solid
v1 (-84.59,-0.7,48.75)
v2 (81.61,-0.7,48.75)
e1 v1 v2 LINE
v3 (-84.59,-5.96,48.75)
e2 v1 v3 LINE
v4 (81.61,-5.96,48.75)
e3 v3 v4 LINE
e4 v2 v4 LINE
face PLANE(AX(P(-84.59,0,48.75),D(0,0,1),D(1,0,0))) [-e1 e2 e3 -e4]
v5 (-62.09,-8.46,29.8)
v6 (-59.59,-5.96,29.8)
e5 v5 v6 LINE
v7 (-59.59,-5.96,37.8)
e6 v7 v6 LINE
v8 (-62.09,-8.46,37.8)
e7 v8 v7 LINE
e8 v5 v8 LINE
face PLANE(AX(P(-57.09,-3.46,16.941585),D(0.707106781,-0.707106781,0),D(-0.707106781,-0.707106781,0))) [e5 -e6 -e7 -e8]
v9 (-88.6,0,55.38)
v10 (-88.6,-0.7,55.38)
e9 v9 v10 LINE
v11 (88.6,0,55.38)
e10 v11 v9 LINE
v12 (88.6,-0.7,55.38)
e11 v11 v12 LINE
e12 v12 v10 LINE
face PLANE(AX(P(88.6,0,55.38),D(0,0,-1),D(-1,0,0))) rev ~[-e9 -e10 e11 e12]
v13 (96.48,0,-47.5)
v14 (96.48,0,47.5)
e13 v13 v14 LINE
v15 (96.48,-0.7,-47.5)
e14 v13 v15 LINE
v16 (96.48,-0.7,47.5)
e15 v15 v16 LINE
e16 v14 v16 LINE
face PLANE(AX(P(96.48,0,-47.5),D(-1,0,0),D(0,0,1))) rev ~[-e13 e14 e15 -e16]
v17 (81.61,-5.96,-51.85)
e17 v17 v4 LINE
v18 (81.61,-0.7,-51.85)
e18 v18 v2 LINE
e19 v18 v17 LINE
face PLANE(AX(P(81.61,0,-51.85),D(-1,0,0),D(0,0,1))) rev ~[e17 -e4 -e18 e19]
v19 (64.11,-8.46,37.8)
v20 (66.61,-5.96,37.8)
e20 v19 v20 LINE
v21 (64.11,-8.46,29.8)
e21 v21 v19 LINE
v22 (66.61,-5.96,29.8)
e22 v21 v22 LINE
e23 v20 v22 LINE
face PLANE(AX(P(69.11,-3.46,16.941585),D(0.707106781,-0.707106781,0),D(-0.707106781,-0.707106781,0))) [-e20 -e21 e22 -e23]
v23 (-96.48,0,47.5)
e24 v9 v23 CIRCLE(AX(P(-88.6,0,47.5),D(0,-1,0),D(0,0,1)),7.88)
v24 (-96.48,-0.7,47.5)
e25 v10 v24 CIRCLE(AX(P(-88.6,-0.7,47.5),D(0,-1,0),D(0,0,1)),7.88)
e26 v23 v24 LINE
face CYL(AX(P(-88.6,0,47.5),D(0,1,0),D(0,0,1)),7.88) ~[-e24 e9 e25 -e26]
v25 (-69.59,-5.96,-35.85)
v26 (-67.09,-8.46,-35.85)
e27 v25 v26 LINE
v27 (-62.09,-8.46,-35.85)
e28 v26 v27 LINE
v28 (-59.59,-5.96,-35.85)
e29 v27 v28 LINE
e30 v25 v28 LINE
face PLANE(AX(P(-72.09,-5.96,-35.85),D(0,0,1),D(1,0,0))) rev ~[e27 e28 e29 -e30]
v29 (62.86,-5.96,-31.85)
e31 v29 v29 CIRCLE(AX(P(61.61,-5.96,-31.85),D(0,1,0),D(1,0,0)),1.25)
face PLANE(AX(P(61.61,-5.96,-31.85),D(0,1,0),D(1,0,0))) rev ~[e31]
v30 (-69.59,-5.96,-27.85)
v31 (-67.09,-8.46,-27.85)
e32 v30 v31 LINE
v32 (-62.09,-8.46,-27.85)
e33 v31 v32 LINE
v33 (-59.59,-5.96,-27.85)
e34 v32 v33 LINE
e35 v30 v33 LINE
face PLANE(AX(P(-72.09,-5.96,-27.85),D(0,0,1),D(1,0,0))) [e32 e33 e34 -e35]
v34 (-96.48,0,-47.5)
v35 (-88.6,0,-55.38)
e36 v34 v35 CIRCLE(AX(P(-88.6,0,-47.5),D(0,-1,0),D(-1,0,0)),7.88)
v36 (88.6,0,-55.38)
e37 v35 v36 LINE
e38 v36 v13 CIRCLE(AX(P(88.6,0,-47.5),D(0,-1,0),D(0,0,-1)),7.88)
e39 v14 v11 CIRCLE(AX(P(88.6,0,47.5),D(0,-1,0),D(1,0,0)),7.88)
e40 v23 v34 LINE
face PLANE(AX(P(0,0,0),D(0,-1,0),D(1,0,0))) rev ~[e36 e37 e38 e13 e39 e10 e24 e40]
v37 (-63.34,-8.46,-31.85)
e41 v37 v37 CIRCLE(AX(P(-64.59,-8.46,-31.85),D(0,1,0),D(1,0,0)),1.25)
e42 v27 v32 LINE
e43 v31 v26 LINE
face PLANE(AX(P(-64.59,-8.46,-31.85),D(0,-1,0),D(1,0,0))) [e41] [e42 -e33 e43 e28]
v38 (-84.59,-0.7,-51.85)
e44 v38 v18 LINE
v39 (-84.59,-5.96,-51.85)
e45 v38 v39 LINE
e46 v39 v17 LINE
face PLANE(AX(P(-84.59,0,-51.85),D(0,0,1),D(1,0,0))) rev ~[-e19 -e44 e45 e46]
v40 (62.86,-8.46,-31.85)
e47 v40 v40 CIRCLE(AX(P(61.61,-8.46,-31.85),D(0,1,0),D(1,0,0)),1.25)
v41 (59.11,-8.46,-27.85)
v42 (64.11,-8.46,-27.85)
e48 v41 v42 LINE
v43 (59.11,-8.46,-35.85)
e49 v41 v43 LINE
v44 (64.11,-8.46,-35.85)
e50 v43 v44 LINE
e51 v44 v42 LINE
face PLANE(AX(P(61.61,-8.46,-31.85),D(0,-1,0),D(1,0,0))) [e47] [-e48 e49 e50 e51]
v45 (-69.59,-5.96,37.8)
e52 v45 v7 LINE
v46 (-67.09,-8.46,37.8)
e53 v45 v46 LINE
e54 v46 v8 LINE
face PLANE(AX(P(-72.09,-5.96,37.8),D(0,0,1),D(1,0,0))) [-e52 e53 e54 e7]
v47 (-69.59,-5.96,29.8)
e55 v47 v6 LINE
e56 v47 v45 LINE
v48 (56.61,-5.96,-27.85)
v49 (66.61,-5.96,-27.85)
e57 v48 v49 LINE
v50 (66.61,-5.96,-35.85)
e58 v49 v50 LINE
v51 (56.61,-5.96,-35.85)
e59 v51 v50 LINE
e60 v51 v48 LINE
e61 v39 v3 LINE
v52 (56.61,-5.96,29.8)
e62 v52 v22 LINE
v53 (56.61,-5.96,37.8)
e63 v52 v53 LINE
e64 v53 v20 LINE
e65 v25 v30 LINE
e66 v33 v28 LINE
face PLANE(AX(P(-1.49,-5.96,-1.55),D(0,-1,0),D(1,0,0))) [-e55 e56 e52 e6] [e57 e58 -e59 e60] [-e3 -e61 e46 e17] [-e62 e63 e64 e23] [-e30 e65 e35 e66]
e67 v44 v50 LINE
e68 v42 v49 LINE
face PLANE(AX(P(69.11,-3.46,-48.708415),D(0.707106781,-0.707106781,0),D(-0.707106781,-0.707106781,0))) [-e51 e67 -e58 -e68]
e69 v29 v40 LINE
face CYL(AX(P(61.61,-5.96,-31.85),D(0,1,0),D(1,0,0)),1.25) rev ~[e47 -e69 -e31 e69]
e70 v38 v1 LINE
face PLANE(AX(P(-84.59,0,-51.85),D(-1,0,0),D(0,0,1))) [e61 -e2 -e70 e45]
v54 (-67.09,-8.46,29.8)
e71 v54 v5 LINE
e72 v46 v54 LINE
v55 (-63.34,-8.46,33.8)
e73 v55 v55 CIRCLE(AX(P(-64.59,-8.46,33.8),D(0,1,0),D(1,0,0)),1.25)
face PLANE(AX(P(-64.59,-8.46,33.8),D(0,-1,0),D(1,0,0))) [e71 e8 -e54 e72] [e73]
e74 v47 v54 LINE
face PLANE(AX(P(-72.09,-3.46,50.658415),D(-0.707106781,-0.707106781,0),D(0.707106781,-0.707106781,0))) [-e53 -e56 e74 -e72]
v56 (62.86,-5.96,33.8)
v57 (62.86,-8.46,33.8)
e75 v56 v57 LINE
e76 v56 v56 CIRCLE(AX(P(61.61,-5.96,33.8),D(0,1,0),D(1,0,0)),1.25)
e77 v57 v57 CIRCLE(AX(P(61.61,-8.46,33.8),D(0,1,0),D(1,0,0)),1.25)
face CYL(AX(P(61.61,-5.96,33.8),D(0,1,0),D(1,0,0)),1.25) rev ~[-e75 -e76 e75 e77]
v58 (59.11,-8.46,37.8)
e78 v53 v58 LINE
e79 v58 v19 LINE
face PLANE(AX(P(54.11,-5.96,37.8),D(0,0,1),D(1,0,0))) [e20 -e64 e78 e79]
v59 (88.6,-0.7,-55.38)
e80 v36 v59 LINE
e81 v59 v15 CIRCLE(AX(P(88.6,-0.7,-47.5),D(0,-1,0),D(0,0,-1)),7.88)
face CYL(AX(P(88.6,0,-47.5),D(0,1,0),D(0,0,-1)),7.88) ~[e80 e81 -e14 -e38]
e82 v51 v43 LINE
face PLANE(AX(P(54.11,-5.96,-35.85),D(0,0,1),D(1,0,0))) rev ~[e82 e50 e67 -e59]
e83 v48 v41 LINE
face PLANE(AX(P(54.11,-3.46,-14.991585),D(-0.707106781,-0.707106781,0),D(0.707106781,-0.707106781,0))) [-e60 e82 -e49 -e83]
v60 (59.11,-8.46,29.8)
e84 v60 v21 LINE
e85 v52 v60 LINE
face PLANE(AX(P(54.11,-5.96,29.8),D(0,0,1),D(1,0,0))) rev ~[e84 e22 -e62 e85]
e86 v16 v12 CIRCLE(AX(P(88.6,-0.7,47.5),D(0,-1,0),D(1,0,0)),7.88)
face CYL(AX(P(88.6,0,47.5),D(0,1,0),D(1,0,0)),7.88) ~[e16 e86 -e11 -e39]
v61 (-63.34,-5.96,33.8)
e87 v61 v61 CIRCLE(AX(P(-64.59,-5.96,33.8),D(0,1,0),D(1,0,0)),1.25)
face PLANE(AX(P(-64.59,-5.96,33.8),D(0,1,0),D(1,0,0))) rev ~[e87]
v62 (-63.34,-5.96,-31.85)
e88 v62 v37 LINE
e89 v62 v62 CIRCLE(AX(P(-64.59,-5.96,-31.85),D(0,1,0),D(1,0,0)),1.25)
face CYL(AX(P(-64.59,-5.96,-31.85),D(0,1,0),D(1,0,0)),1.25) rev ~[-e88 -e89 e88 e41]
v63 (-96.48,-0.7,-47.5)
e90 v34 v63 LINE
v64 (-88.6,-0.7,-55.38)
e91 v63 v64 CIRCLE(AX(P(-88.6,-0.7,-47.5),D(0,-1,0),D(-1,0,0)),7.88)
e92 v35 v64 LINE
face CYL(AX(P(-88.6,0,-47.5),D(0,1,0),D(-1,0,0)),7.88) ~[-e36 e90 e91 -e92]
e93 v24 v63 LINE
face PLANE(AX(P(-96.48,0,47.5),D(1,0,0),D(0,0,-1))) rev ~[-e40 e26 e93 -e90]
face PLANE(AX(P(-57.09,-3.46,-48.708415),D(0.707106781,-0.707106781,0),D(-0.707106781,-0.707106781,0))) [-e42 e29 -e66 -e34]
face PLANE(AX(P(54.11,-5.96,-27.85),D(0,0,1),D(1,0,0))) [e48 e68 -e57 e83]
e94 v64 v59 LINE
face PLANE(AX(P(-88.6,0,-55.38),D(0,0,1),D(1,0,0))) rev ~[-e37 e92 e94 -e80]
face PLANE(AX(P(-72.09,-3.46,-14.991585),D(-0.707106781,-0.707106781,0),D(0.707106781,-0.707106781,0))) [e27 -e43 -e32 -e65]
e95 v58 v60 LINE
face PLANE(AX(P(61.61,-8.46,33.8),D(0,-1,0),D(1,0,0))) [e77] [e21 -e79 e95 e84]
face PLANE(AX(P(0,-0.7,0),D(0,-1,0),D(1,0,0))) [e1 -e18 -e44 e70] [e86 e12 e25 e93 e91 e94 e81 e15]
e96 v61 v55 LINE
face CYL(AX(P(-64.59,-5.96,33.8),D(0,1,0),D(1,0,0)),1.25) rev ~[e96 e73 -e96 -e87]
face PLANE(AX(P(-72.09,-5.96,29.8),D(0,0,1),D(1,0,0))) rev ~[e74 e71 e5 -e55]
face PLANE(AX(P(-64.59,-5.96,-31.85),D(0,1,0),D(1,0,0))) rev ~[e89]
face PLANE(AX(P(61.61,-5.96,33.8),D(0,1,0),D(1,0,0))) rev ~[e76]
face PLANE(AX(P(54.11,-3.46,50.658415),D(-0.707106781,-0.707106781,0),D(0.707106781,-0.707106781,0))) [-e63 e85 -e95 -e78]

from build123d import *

# Parameters (mm, degrees)
F0_W         = 166.2
F0_H         = 100.6
F1_DEPTH     = 5.96
F2_DEPTH     = 0.7
F3_W         = 15
F3_H         = 8
F4_DEPTH     = 2.5
F5_T4_DEPTH  = 33.7168298797
F5_T9_DEPTH  = 33.7168298797
F5_T14_DEPTH = 33.7168298797
F5_T19_DEPTH = 33.7168298797
F5_T24_DEPTH = 33.7168298797
F5_T29_DEPTH = 33.7168298797
F5_T34_DEPTH = 33.7168298797
F5_T39_DEPTH = 33.7168298797
F6_D         = 2.5
F6_DEPTH     = 2.501


# Not quite as in the source:
# - a fillet or chamfer that OpenCascade refuses, or shapes differently, is made with other operations: its cross-section is extruded or revolved along the edge and cut away or added


with BuildPart() as f1:
    # F0 (on Front) → F1 (new body)
    with BuildSketch(Plane.XZ):
        with Locations((-1.49, -1.55)):
            Rectangle(F0_W, F0_H)
    extrude(amount=F1_DEPTH)

    # F0 (on Front) → F2 (join)
    with BuildSketch(Plane.XZ):
        with BuildLine():
            ThreePointArc((-96.48, -47.5), (-94.1720014358, -53.0720014358), (-88.6, -55.38))
            Line((-88.6, -55.38), (88.6, -55.38))
            ThreePointArc((88.6, -55.38), (94.1720014357, -53.0720014357), (96.48, -47.5))
            Line((96.48, -47.5), (96.48, 47.5))
            ThreePointArc((96.48, 47.5), (94.1720014358, 53.0720014358), (88.6, 55.38))
            Line((88.6, 55.38), (-88.6, 55.38))
            ThreePointArc((-88.6, 55.38), (-94.1720014357, 53.0720014357), (-96.48, 47.5))
            Line((-96.48, 47.5), (-96.48, -47.5))
        make_face()
        with Locations((-1.49, -1.55)):
            Rectangle(F0_W, F0_H, mode=Mode.SUBTRACT)
    extrude(amount=F2_DEPTH)

    # F3 (on face) → F4 (join)
    with BuildSketch(Plane.XZ.offset(5.96)):
        with Locations((-64.59, 33.8)):
            Rectangle(F3_W, F3_H)
        with Locations((-64.59, -31.85)):
            Rectangle(F3_W, F3_H)
        with Locations((61.61, -31.85)):
            Rectangle(F3_W, F3_H)
        with Locations((61.61, 33.8)):
            Rectangle(F3_W, F3_H)
    extrude(amount=F4_DEPTH)

    # F5: chamfer of 5 on 8 edges, made by hand


with BuildPart() as f5_tool2:
    # F5_s3 → F5_t4 (new body)
    with BuildSketch(Plane.XY.offset(50.6584149398)):
        Polygon((-72.09, -3.46), (-67.09, -8.46), (-72.09, -8.46), align=None)
    extrude(amount=-F5_T4_DEPTH)

    split(bisect_by=Plane.XZ.offset(5.96), keep=Keep.TOP)


with BuildPart() as f1_1:
    add(f1.part)

    # F5_t1: cut F5_tool2
    add(f5_tool2.part, mode=Mode.SUBTRACT)


with BuildPart() as f5_tool7:
    # F5_s8 → F5_t9 (new body)
    with BuildSketch(Plane.XY.offset(16.9415850602)):
        Polygon((-57.09, -3.46), (-62.09, -8.46), (-57.09, -8.46), align=None)
    extrude(amount=F5_T9_DEPTH)

    split(bisect_by=Plane.XZ.offset(5.96), keep=Keep.TOP)


with BuildPart() as f1_2:
    add(f1_1.part)

    # F5_t6: cut F5_tool7
    add(f5_tool7.part, mode=Mode.SUBTRACT)


with BuildPart() as f5_tool12:
    # F5_s13 → F5_t14 (new body)
    with BuildSketch(Plane.XY.offset(-14.9915850602)):
        Polygon((-72.09, -3.46), (-67.09, -8.46), (-72.09, -8.46), align=None)
    extrude(amount=-F5_T14_DEPTH)

    split(bisect_by=Plane.XZ.offset(5.96), keep=Keep.TOP)


with BuildPart() as f1_3:
    add(f1_2.part)

    # F5_t11: cut F5_tool12
    add(f5_tool12.part, mode=Mode.SUBTRACT)


with BuildPart() as f5_tool17:
    # F5_s18 → F5_t19 (new body)
    with BuildSketch(Plane.XY.offset(-48.7084149398)):
        Polygon((-57.09, -3.46), (-62.09, -8.46), (-57.09, -8.46), align=None)
    extrude(amount=F5_T19_DEPTH)

    split(bisect_by=Plane.XZ.offset(5.96), keep=Keep.TOP)


with BuildPart() as f1_4:
    add(f1_3.part)

    # F5_t16: cut F5_tool17
    add(f5_tool17.part, mode=Mode.SUBTRACT)


with BuildPart() as f5_tool22:
    # F5_s23 → F5_t24 (new body)
    with BuildSketch(Plane.XY.offset(50.6584149398)):
        Polygon((54.11, -3.46), (59.11, -8.46), (54.11, -8.46), align=None)
    extrude(amount=-F5_T24_DEPTH)

    split(bisect_by=Plane.XZ.offset(5.96), keep=Keep.TOP)


with BuildPart() as f1_5:
    add(f1_4.part)

    # F5_t21: cut F5_tool22
    add(f5_tool22.part, mode=Mode.SUBTRACT)


with BuildPart() as f5_tool27:
    # F5_s28 → F5_t29 (new body)
    with BuildSketch(Plane.XY.offset(16.9415850602)):
        Polygon((69.11, -3.46), (64.11, -8.46), (69.11, -8.46), align=None)
    extrude(amount=F5_T29_DEPTH)

    split(bisect_by=Plane.XZ.offset(5.96), keep=Keep.TOP)


with BuildPart() as f1_6:
    add(f1_5.part)

    # F5_t26: cut F5_tool27
    add(f5_tool27.part, mode=Mode.SUBTRACT)


with BuildPart() as f5_tool32:
    # F5_s33 → F5_t34 (new body)
    with BuildSketch(Plane.XY.offset(-14.9915850602)):
        Polygon((54.11, -3.46), (59.11, -8.46), (54.11, -8.46), align=None)
    extrude(amount=-F5_T34_DEPTH)

    split(bisect_by=Plane.XZ.offset(5.96), keep=Keep.TOP)


with BuildPart() as f1_7:
    add(f1_6.part)

    # F5_t31: cut F5_tool32
    add(f5_tool32.part, mode=Mode.SUBTRACT)


with BuildPart() as f5_tool37:
    # F5_s38 → F5_t39 (new body)
    with BuildSketch(Plane.XY.offset(-48.7084149398)):
        Polygon((69.11, -3.46), (64.11, -8.46), (69.11, -8.46), align=None)
    extrude(amount=F5_T39_DEPTH)

    split(bisect_by=Plane.XZ.offset(5.96), keep=Keep.TOP)


with BuildPart() as f1_8:
    add(f1_7.part)

    # F5_t36: cut F5_tool37
    add(f5_tool37.part, mode=Mode.SUBTRACT)

    # F6 (through all, one way)
    with BuildSketch(Plane(origin=(0, -5.96, 0), x_dir=(1, 0, 0), z_dir=(0, 1, 0))):
        with Locations((-64.59, -33.8), (-64.59, 31.85), (61.61, 31.85), (61.61, -33.8)):
            Circle(F6_D / 2)
    extrude(amount=-F6_DEPTH, mode=Mode.SUBTRACT)


solid = f1_8.part
